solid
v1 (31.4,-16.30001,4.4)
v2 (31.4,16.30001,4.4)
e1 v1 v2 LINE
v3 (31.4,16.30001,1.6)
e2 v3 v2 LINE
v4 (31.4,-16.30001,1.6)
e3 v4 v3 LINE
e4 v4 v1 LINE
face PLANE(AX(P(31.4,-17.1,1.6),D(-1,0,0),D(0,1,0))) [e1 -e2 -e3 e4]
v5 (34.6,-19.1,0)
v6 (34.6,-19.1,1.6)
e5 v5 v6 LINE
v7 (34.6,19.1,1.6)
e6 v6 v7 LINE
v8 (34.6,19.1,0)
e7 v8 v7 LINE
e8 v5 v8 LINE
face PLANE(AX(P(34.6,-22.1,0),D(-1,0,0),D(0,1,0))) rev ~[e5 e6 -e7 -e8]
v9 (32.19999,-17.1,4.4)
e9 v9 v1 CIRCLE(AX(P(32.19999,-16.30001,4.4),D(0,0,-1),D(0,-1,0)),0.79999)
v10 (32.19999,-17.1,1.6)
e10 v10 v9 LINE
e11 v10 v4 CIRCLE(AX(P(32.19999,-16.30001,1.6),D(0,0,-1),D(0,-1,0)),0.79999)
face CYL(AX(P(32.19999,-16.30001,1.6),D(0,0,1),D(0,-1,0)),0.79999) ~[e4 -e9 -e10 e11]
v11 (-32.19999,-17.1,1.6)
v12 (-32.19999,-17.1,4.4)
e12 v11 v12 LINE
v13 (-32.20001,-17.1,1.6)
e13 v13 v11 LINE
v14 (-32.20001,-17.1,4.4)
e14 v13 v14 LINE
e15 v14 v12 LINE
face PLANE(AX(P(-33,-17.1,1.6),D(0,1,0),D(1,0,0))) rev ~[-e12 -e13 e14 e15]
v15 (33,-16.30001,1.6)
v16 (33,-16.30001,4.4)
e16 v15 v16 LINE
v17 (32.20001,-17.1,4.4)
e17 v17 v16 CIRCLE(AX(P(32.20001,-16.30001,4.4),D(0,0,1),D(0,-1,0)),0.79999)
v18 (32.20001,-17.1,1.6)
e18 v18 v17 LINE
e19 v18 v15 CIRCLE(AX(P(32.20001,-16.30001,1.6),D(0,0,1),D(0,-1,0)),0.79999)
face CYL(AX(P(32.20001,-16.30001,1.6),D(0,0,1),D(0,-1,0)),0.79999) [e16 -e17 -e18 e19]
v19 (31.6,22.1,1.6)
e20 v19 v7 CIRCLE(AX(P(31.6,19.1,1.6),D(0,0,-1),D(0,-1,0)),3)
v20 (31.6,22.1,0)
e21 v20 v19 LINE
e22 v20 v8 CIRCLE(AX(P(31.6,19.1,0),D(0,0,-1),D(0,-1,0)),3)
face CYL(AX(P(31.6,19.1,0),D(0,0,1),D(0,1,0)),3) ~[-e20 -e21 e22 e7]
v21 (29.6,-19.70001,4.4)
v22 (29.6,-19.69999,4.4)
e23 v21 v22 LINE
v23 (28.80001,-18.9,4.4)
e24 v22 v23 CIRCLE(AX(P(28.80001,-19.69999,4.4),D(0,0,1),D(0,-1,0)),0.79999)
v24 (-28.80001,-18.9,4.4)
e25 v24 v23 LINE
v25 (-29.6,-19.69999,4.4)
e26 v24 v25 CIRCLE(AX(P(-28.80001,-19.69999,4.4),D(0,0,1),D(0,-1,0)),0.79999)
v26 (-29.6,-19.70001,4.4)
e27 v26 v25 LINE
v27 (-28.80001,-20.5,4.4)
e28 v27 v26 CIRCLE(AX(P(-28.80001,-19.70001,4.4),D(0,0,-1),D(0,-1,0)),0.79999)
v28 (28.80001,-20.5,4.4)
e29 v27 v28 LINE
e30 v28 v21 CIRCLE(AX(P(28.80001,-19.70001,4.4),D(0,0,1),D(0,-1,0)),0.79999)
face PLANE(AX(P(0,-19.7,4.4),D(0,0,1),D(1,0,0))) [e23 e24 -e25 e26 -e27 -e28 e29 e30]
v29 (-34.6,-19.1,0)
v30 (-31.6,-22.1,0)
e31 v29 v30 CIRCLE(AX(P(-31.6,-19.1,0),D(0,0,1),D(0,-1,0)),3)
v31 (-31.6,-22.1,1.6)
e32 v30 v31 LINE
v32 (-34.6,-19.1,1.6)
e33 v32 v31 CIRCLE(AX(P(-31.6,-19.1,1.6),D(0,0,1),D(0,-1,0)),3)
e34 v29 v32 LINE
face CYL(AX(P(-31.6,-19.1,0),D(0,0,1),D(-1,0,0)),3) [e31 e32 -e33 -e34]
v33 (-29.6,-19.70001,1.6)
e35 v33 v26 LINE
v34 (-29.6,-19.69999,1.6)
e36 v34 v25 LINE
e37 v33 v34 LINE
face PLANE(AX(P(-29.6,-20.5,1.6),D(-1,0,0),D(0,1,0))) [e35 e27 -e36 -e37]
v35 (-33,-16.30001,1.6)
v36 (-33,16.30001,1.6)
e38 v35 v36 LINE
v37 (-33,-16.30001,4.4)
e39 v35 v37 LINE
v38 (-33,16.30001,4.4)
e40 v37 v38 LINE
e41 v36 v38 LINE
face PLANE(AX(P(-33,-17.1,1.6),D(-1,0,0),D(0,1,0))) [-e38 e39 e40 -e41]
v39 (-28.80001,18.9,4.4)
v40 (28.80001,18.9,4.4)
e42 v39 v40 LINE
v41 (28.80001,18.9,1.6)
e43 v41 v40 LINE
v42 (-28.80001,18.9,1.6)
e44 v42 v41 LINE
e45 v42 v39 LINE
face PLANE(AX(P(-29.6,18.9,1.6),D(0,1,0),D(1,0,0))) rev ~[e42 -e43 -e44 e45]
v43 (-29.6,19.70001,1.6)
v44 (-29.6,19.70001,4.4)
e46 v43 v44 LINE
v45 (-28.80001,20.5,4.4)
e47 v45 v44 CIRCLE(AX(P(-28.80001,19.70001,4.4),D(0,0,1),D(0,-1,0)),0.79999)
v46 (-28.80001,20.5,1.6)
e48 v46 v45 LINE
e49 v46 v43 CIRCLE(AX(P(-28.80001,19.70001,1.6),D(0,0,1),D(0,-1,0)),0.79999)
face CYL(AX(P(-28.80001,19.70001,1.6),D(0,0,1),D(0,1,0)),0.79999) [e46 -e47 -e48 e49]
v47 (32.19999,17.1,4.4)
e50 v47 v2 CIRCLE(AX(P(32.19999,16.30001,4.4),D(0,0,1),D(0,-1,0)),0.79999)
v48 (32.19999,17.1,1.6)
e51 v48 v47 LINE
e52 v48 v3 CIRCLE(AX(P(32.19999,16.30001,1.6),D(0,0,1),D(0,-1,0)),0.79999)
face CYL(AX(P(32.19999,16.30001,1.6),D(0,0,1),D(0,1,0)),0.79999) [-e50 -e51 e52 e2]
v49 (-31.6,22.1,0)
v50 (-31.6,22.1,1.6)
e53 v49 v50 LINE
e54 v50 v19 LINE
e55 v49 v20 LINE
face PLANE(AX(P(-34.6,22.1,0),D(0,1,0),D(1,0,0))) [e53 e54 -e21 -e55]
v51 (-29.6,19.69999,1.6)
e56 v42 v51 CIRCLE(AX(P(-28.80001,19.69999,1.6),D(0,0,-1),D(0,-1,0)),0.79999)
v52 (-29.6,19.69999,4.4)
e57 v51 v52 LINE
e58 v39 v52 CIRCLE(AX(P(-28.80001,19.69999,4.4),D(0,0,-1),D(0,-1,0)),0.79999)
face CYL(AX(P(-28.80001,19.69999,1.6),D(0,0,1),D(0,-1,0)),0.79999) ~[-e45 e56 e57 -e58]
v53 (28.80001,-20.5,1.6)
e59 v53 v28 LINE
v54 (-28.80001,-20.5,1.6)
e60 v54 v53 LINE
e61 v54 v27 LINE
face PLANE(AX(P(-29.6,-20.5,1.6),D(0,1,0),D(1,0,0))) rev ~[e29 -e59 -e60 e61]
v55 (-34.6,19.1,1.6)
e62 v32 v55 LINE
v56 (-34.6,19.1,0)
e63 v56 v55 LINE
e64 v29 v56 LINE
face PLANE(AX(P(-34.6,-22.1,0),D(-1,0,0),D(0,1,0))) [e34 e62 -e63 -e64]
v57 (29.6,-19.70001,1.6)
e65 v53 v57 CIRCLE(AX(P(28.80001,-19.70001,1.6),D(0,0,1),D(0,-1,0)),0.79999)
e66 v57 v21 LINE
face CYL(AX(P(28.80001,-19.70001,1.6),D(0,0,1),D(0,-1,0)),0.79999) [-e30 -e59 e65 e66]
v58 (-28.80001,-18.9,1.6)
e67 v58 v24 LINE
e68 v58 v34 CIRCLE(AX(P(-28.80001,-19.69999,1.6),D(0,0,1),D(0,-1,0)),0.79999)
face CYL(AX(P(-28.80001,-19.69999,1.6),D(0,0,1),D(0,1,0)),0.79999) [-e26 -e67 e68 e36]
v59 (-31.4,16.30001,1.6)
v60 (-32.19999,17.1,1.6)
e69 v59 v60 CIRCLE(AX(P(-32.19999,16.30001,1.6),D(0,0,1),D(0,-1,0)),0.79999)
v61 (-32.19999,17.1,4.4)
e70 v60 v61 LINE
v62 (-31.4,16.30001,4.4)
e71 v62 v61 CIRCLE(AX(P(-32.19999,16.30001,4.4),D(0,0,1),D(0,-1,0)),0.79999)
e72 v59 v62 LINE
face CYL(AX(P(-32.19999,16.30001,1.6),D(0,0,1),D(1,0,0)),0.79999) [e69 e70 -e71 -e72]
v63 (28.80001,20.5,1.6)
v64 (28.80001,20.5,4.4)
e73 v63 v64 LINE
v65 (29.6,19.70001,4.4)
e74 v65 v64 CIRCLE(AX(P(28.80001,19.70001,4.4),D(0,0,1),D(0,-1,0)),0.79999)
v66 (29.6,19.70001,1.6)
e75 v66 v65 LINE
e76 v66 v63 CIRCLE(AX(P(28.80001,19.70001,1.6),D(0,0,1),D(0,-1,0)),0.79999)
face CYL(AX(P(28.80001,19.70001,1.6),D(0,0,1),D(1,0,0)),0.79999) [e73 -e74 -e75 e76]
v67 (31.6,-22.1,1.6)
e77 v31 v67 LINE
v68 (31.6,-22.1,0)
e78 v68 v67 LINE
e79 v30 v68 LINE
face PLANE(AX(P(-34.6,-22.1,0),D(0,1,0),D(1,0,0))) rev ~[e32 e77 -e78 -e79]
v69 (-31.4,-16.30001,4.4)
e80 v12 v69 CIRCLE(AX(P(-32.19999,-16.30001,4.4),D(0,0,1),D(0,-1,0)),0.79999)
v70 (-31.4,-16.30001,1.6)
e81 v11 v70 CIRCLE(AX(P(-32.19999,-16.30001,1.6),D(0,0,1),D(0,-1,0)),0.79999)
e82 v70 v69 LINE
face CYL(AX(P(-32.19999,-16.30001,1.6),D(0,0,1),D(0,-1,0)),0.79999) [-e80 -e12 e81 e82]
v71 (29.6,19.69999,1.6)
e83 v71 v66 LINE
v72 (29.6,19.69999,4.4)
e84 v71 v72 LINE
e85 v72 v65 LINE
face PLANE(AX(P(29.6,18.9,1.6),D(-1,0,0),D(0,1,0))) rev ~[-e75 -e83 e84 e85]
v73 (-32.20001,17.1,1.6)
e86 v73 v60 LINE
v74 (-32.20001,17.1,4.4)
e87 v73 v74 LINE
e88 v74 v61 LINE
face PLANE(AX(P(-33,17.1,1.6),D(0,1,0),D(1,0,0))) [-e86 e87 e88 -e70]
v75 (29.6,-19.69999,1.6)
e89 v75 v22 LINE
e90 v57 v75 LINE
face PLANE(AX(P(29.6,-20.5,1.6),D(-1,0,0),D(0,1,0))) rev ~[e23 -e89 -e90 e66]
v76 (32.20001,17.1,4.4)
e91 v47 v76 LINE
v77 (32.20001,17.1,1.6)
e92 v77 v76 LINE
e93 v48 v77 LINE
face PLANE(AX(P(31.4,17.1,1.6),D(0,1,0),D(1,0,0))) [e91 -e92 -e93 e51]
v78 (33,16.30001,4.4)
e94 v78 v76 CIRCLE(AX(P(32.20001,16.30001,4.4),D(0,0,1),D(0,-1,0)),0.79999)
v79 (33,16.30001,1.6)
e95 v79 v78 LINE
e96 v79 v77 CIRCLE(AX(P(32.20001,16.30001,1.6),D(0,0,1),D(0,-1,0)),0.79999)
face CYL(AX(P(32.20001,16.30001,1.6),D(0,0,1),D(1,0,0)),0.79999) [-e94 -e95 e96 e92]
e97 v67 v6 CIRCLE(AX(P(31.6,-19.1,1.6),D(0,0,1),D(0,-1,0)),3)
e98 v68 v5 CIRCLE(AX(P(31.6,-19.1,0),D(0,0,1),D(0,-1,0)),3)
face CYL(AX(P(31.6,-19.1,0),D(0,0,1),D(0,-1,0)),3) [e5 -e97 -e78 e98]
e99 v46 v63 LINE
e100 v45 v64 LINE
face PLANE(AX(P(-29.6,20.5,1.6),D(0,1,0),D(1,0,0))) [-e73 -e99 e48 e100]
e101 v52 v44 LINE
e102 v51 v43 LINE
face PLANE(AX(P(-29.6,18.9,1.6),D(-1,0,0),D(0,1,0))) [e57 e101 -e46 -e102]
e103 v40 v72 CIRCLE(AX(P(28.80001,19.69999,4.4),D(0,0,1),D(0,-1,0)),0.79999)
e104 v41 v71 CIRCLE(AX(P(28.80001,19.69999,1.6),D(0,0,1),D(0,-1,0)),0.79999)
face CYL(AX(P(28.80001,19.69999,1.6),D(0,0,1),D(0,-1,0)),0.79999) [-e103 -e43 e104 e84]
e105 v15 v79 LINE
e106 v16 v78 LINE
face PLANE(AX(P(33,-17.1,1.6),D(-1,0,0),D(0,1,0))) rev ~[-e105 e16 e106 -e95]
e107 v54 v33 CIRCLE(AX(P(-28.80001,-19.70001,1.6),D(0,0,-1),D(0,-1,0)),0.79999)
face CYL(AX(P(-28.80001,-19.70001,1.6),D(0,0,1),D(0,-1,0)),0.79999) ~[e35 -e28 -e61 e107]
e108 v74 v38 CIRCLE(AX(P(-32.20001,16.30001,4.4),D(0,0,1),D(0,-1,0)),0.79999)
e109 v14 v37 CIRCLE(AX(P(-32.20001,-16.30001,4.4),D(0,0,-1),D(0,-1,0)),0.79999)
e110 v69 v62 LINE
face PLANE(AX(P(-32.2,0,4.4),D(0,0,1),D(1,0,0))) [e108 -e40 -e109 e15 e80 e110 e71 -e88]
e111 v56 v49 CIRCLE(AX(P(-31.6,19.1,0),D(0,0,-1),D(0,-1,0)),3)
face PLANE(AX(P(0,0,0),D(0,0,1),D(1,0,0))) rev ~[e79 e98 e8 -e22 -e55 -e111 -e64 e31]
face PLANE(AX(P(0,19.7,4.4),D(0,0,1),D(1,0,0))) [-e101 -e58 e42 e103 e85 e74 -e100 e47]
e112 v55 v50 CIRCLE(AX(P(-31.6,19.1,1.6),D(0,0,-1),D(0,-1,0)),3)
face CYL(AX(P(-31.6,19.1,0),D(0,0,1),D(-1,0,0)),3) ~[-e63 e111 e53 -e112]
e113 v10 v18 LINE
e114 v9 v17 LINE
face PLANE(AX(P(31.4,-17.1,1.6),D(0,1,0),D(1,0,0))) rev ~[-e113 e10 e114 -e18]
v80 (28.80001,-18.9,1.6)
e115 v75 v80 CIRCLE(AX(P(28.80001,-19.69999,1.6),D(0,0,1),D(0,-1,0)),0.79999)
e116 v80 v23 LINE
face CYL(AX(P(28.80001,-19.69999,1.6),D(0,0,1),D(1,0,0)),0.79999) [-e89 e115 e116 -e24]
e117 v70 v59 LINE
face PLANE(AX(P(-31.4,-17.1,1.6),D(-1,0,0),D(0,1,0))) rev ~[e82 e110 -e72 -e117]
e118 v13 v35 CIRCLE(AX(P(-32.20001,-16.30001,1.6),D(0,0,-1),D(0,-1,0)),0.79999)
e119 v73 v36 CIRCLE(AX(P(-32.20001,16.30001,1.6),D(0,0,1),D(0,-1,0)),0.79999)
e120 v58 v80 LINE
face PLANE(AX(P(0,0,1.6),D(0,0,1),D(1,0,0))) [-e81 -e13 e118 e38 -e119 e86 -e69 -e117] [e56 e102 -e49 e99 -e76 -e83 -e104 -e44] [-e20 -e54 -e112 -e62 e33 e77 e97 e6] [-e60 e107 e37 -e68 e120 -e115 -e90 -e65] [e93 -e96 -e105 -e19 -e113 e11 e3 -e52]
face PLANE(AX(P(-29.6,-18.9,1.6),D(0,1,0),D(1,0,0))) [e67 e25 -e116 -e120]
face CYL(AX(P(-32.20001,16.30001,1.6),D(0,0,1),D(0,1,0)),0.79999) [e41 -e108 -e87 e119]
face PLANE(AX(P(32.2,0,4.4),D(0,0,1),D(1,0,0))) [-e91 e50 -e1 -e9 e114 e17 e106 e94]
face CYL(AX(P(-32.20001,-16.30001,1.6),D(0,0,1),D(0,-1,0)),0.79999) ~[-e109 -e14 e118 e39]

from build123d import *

# Parameters (mm, degrees)
F0_W     = 69.2
F0_H     = 44.2
F1_DEPTH = 1.6
F2_W     = 59.2
F2_H     = 1.6
F2_W_2   = 1.6
F2_H_2   = 34.2
F3_DEPTH = 2.8
F4_R     = 3
F5_R     = 0.79999


# Not quite as in the source:
# - a fillet or chamfer is up to 0.001 mm smaller than in the source, because OpenCascade refuses the exact size


with BuildPart() as f1:
    # F0 (on Top) → F1 (new body)
    with BuildSketch(Plane.XY):
        Rectangle(F0_W, F0_H)
    extrude(amount=F1_DEPTH)

    # F2 (on face) → F3 (join)
    with BuildSketch(Plane.XY.offset(1.6)):
        with Locations((0, -19.7)):
            Rectangle(F2_W, F2_H)
        with Locations((-32.2, 0)):
            Rectangle(F2_W_2, F2_H_2)
        with Locations((32.2, 0)):
            Rectangle(F2_W_2, F2_H_2)
        with Locations((0, 19.7)):
            Rectangle(F2_W, F2_H)
    extrude(amount=F3_DEPTH)

    # F4
    f4_edges = [f1.edges().sort_by_distance(p)[0] for p in [
        (34.6, -22.1, 0.8),
        (34.6, 22.1, 0.8),
        (-34.6, -22.1, 0.8),
        (-34.6, 22.1, 0.8),
    ]]
    fillet(f4_edges, radius=F4_R)

    # F5 (radius 0.8 in the source; OpenCascade refuses exactly that, so slightly less here)
    f5_edges = [f1.edges().sort_by_distance(p)[0] for p in [
        (29.6, -20.5, 3),
        (29.6, -18.9, 3),
        (33, -17.1, 3),
        (31.4, -17.1, 3),
        (29.6, 18.9, 3),
        (29.6, 20.5, 3),
        (-33, -17.1, 3),
        (-31.4, 17.1, 3),
        (-31.4, -17.1, 3),
        (-29.6, 18.9, 3),
        (31.4, 17.1, 3),
        (33, 17.1, 3),
        (-33, 17.1, 3),
        (-29.6, -18.9, 3),
        (-29.6, 20.5, 3),
        (-29.6, -20.5, 3),
    ]]
    fillet(f5_edges, radius=F5_R)


solid = f1.part
